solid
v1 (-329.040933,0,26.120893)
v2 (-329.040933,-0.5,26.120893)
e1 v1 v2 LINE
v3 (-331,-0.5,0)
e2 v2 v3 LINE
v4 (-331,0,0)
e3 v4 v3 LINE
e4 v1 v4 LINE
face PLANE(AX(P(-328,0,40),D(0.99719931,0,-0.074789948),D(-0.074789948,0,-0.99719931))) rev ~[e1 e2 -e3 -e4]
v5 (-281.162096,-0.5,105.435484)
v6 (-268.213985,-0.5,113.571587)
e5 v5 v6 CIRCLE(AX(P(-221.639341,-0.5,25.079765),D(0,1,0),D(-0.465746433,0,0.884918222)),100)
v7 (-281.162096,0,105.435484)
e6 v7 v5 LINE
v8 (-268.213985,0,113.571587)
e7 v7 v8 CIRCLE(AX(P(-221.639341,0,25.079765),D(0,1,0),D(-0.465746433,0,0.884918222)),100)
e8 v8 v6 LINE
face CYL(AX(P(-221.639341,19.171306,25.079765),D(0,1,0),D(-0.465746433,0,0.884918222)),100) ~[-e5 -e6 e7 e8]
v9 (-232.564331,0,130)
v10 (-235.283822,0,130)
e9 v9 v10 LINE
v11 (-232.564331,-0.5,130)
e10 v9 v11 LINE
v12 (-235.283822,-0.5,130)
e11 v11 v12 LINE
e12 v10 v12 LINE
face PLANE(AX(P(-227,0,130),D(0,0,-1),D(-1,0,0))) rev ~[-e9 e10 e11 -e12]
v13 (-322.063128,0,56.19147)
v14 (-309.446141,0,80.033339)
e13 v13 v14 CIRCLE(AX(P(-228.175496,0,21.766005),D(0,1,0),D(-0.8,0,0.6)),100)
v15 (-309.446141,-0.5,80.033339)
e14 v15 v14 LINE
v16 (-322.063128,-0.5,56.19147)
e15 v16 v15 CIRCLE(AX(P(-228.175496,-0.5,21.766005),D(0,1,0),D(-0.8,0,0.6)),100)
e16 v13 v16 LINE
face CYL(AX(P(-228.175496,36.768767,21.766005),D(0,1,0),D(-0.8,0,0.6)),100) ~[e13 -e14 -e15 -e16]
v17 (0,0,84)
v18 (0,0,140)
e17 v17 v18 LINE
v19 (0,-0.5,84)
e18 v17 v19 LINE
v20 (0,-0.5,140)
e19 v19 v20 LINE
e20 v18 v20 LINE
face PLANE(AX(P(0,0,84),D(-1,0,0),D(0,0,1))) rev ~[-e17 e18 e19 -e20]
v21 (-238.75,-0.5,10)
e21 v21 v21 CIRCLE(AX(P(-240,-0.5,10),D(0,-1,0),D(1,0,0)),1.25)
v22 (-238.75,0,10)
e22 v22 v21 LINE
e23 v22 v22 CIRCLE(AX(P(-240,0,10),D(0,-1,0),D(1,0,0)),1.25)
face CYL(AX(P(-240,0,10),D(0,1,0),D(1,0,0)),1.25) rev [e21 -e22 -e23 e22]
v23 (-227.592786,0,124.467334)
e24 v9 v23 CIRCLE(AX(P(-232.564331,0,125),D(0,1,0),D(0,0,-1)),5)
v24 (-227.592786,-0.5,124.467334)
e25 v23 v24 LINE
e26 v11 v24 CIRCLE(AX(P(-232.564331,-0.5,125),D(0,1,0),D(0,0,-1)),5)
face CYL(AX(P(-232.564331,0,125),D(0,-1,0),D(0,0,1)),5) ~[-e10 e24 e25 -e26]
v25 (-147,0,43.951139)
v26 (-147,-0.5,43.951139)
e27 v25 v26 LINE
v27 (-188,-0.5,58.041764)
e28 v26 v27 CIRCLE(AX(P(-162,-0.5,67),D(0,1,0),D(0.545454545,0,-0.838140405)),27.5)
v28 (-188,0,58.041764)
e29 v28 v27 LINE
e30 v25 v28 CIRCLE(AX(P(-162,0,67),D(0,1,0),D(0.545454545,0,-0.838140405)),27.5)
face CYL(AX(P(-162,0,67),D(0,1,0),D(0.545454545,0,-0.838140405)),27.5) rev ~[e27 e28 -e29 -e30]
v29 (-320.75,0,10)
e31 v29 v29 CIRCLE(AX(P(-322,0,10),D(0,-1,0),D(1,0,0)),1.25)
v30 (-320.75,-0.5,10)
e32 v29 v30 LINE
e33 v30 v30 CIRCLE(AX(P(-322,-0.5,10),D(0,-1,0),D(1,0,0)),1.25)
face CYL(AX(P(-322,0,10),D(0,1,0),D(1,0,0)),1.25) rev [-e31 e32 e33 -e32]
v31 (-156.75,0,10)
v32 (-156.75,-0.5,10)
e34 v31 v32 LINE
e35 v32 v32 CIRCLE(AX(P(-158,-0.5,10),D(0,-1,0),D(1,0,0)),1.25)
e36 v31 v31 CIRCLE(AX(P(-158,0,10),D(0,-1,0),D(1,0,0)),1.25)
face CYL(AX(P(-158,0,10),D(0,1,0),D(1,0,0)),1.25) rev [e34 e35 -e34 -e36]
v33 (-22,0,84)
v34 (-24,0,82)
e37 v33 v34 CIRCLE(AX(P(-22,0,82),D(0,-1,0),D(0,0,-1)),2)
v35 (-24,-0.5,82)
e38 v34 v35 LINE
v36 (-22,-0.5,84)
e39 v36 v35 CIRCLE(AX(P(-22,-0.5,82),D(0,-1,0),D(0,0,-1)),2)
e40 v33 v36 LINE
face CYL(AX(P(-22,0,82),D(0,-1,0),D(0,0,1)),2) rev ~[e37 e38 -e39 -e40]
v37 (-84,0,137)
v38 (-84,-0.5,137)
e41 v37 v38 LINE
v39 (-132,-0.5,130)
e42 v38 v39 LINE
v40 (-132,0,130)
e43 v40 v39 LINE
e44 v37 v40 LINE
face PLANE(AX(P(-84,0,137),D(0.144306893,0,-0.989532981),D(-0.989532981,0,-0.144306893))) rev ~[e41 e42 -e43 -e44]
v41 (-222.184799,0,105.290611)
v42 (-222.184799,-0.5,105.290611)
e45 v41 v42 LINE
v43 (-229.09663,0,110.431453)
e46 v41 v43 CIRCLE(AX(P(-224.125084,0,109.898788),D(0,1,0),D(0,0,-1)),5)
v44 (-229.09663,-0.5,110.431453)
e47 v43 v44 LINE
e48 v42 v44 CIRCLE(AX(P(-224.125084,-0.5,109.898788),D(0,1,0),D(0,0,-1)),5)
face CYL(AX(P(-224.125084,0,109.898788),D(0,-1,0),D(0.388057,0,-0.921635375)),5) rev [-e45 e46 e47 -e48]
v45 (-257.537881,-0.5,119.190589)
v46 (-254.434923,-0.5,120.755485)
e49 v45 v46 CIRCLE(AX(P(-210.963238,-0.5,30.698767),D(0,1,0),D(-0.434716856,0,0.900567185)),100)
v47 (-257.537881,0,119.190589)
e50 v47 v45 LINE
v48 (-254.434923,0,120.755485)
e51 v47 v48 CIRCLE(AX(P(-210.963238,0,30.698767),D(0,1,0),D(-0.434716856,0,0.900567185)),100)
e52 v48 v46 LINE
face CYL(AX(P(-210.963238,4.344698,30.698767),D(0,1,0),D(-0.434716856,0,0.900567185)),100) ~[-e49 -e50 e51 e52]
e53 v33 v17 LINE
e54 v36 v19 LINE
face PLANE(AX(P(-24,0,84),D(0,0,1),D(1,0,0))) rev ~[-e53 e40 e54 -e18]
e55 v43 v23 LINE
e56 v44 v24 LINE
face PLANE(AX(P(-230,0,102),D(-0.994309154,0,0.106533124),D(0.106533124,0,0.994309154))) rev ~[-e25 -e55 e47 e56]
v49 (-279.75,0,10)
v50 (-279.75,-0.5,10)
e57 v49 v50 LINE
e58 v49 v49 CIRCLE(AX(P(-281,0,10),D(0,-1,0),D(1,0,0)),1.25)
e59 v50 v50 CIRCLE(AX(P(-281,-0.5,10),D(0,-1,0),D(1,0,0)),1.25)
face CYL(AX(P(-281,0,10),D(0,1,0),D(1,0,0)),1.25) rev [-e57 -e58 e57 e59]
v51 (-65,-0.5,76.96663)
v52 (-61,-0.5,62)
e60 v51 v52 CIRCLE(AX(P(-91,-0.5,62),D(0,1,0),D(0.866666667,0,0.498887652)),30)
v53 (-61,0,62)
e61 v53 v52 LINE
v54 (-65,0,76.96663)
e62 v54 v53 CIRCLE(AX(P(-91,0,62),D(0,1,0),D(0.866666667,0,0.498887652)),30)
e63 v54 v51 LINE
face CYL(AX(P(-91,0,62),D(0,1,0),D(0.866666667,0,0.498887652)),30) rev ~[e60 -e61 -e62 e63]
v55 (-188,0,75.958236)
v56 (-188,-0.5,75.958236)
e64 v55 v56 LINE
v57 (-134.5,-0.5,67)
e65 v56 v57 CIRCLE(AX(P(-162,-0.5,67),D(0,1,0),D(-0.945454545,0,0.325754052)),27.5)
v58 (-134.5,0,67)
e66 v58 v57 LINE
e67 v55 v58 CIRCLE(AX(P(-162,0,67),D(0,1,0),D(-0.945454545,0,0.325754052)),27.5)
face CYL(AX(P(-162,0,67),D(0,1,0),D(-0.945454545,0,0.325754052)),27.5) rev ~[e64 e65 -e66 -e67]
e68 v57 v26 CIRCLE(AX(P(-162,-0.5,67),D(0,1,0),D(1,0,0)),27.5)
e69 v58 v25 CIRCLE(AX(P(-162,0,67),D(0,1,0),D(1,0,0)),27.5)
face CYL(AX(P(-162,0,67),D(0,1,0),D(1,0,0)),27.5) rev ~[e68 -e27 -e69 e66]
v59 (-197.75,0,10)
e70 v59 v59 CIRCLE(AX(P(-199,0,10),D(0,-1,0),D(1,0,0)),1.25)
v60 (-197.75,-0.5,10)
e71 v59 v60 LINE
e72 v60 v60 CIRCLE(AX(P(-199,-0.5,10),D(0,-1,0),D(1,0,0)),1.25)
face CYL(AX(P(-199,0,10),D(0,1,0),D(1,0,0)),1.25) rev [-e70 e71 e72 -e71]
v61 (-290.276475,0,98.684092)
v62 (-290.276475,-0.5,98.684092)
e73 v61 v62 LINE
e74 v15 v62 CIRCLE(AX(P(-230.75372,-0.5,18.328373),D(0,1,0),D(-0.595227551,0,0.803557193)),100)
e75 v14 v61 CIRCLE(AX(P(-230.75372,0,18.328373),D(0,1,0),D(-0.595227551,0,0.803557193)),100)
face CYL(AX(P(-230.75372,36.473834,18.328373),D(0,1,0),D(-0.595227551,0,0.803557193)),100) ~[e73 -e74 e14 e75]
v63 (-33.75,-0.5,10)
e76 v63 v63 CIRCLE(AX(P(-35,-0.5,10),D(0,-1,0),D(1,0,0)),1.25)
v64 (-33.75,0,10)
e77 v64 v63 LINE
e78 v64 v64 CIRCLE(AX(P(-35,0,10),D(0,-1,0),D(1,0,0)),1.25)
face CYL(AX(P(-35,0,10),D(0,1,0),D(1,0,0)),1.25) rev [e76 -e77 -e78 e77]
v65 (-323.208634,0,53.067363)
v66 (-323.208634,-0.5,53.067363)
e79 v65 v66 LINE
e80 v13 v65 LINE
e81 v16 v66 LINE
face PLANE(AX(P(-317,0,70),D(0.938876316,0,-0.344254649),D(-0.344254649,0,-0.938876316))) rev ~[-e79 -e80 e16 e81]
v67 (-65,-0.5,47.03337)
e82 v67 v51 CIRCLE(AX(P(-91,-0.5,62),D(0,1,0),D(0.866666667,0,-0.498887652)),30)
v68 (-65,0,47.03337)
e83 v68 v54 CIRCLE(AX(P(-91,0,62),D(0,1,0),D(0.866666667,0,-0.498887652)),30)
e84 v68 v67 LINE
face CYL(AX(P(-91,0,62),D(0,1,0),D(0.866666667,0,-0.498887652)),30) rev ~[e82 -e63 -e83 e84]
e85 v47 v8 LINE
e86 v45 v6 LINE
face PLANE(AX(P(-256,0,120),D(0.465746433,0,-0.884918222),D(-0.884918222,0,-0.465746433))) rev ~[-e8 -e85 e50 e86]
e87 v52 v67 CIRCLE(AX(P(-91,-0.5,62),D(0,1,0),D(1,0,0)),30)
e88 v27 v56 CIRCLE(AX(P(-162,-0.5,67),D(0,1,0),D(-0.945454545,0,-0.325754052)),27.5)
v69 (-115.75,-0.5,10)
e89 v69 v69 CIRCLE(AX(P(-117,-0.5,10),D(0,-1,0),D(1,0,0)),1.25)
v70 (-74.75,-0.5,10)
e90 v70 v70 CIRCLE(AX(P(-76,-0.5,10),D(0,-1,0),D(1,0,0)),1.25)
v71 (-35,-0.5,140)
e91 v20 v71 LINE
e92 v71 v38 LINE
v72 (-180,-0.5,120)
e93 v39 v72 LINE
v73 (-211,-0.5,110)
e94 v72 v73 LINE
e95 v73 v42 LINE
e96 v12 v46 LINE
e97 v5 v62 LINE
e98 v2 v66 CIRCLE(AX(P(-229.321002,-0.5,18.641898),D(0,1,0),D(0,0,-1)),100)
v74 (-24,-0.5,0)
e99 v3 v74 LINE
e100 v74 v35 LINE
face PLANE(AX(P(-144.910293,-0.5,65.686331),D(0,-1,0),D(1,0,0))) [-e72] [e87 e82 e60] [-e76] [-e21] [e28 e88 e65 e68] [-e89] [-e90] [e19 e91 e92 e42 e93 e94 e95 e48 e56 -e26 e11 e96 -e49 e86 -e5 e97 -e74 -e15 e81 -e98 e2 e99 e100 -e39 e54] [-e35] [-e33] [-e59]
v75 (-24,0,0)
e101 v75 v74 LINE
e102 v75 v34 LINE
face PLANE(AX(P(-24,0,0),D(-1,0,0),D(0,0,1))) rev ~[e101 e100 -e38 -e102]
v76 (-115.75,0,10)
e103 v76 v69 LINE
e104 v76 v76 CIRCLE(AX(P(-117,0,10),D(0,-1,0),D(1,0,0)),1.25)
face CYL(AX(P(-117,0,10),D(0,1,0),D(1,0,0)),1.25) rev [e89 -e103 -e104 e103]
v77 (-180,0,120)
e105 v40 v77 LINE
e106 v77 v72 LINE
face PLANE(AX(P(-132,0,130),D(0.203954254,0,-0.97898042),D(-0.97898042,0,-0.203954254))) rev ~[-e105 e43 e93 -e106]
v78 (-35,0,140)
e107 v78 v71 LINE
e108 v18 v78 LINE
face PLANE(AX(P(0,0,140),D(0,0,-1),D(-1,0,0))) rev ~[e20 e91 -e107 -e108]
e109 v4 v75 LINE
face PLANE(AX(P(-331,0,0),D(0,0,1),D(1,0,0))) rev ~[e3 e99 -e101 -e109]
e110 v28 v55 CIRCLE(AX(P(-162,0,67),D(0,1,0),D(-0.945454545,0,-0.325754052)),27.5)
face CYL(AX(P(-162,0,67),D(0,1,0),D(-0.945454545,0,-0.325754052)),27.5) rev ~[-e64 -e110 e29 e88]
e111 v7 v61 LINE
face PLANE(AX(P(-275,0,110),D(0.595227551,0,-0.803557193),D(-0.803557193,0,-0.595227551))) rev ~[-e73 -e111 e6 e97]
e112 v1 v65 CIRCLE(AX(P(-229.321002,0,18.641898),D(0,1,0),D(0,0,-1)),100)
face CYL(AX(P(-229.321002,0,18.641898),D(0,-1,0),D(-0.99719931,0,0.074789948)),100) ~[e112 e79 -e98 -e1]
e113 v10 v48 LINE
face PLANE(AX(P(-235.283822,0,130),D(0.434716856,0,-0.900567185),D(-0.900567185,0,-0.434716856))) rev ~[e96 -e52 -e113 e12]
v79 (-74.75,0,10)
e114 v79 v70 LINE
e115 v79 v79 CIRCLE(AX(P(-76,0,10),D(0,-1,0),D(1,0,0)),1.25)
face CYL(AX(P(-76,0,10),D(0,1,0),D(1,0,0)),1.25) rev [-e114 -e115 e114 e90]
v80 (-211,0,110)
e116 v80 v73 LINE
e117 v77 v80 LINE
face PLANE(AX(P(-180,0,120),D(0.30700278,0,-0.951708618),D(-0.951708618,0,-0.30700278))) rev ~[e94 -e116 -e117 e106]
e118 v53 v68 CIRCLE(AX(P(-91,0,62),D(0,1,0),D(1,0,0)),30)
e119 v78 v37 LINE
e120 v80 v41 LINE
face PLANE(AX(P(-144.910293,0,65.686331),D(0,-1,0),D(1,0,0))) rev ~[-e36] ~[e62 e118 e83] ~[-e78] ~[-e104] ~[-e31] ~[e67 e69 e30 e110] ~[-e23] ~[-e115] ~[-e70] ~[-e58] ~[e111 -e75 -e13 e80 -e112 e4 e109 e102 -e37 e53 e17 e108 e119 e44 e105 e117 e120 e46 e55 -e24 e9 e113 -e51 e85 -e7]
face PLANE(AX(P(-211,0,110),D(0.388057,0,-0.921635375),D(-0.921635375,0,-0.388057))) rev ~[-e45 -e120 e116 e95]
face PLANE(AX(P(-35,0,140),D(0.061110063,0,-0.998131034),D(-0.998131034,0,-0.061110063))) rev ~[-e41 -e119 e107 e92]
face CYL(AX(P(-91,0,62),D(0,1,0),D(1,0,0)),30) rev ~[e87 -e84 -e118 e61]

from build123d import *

# Parameters (mm, degrees)
F0_R        = 1.25
F1_DEPTH    = 0.5
F2_R        = 5
F3_T1_DEPTH = 74.0375335511
F3_T3_DEPTH = 9.1893951821
F3_T5_DEPTH = 38.8426126869
F3_T7_DEPTH = 73.4476683762
F4_R        = 100
F5_R        = 5
F6_R        = 2


# Not quite as in the source:
# - a fillet or chamfer that OpenCascade refuses, or shapes differently, is made with other operations: its cross-section is extruded or revolved along the edge and cut away or added


with BuildPart() as f1:
    # F0 (on Front) → F1 (new body)
    with BuildSketch(Plane.XZ):
        with BuildLine():
            Line((-65, 0), (-24, 0))
            Line((-24, 0), (-24, 84))
            Line((-24, 84), (0, 84))
            Line((0, 84), (0, 140))
            Line((0, 140), (-35, 140))
            Line((-35, 140), (-84, 137))
            Line((-84, 137), (-132, 130))
            Line((-132, 130), (-180, 120))
            Line((-180, 120), (-211, 110))
            Line((-211, 110), (-230, 102))
            Line((-230, 102), (-227, 130))
            Line((-227, 130), (-235.2838218212, 130))
            Line((-235.2838218212, 130), (-256, 120))
            Line((-256, 120), (-275, 110))
            Line((-275, 110), (-302, 90))
            Line((-302, 90), (-311, 78))
            Line((-311, 78), (-311, 0))
            Line((-311, 0), (-270, 0))
            Line((-270, 0), (-229, 0))
            Line((-229, 0), (-188, 0))
            Line((-188, 0), (-188, 58.0417635664))
            ThreePointArc((-188, 58.0417635664), (-189.5, 67), (-188, 75.9582364336))
            ThreePointArc((-188, 75.9582364336), (-157.4585244689, 94.1224077102), (-134.5, 67))
            ThreePointArc((-134.5, 67), (-137.8261504927, 53.8898893979), (-147, 43.9511388568))
            Line((-147, 43.9511388568), (-147, 0))
            Line((-147, 0), (-106, 0))
            Line((-106, 0), (-106, 36.0192378865))
            ThreePointArc((-106, 36.0192378865), (-112.1995806787, 83.2268174498), (-65, 76.9666295471))
            ThreePointArc((-65, 76.9666295471), (-62.0172465076, 69.7459666924), (-61, 62))
            ThreePointArc((-61, 62), (-62.0172465076, 54.2540333076), (-65, 47.0333704529))
            Line((-65, 47.0333704529), (-65, 0))
        make_face()
        with Locations((-281, 10)):
            Circle(F0_R, mode=Mode.SUBTRACT)
        with Locations((-240, 10)):
            Circle(F0_R, mode=Mode.SUBTRACT)
        with Locations((-199, 10)):
            Circle(F0_R, mode=Mode.SUBTRACT)
        with Locations((-117, 10)):
            Circle(F0_R, mode=Mode.SUBTRACT)
        with Locations((-35, 10)):
            Circle(F0_R, mode=Mode.SUBTRACT)
        Polygon((-331, 0), (-311, 0), (-311, 78), (-317, 70), (-328, 40), align=None)
        with Locations((-322, 10)):
            Circle(F0_R, mode=Mode.SUBTRACT)
        with BuildLine():
            Line((-188, 0), (-147, 0))
            Line((-147, 0), (-147, 43.9511388568))
            ThreePointArc((-147, 43.9511388568), (-170.9379206853, 40.9930091356), (-188, 58.0417635664))
            Line((-188, 58.0417635664), (-188, 0))
        make_face()
        with Locations((-158, 10)):
            Circle(F0_R, mode=Mode.SUBTRACT)
        with BuildLine():
            Line((-106, 0), (-65, 0))
            Line((-65, 0), (-65, 47.0333704529))
            ThreePointArc((-65, 47.0333704529), (-83.2168271863, 33.0272158578), (-106, 36.0192378865))
            Line((-106, 36.0192378865), (-106, 0))
        make_face()
        with Locations((-76, 10)):
            Circle(F0_R, mode=Mode.SUBTRACT)
    extrude(amount=F1_DEPTH)

    # F2
    f2_edges = [f1.edges().sort_by_distance(p)[0] for p in [
        (-230, -0.25, 102),
    ]]
    fillet(f2_edges, radius=F2_R)

    # F3: fillet of radius 100 on 4 edges, made by hand

    # F3_s2 → F3_t1 (cut)
    with BuildSketch(Plane.XZ.offset(-36.7687667756)):
        with BuildLine():
            ThreePointArc((-308.1754959739, 81.7660053682), (-316.0546249868, 69.4866370062), (-322.0631275625, 56.191470284))
            Line((-322.0631275625, 56.191470284), (-317, 70))
            Line((-317, 70), (-308.1754959739, 81.7660053682))
        make_face()
    extrude(amount=F3_T1_DEPTH, mode=Mode.SUBTRACT)

    # F3_s4 → F3_t3 (cut)
    with BuildSketch(Plane.XZ.offset(-4.3446975911)):
        with BuildLine():
            ThreePointArc((-254.4349231681, 120.7554853112), (-255.9932004856, 119.9865175696), (-257.5378808276, 119.1905890381))
            Line((-257.5378808276, 119.1905890381), (-256, 120))
            Line((-256, 120), (-254.4349231681, 120.7554853112))
        make_face()
    extrude(amount=F3_T3_DEPTH, mode=Mode.SUBTRACT)

    # F3_s6 → F3_t5 (cut)
    with BuildSketch(Plane.XZ.offset(-19.1713063434)):
        with BuildLine():
            ThreePointArc((-268.2139846679, 113.5715870169), (-274.8437916361, 109.7514039115), (-281.1620964472, 105.4354841132))
            Line((-281.1620964472, 105.4354841132), (-275, 110))
            Line((-275, 110), (-268.2139846679, 113.5715870169))
        make_face()
    extrude(amount=F3_T5_DEPTH, mode=Mode.SUBTRACT)

    # F3_s8 → F3_t7 (cut)
    with BuildSketch(Plane.XZ.offset(-36.4738341881)):
        with BuildLine():
            ThreePointArc((-290.2764752677, 98.6840923943), (-301.2536395134, 89.2491836695), (-310.7537202051, 78.3283730598))
            Line((-310.7537202051, 78.3283730598), (-302, 90))
            Line((-302, 90), (-290.2764752677, 98.6840923943))
        make_face()
    extrude(amount=F3_T7_DEPTH, mode=Mode.SUBTRACT)

    # F4
    f4_edges = [f1.edges().sort_by_distance(p)[0] for p in [
        (-328, -0.25, 40),
    ]]
    fillet(f4_edges, radius=F4_R)

    # F5
    f5_edges = [f1.edges().sort_by_distance(p)[0] for p in [
        (-227, -0.25, 130),
    ]]
    fillet(f5_edges, radius=F5_R)

    # F6
    f6_edges = [f1.edges().sort_by_distance(p)[0] for p in [
        (-24, -0.25, 84),
    ]]
    fillet(f6_edges, radius=F6_R)


solid = f1.part
